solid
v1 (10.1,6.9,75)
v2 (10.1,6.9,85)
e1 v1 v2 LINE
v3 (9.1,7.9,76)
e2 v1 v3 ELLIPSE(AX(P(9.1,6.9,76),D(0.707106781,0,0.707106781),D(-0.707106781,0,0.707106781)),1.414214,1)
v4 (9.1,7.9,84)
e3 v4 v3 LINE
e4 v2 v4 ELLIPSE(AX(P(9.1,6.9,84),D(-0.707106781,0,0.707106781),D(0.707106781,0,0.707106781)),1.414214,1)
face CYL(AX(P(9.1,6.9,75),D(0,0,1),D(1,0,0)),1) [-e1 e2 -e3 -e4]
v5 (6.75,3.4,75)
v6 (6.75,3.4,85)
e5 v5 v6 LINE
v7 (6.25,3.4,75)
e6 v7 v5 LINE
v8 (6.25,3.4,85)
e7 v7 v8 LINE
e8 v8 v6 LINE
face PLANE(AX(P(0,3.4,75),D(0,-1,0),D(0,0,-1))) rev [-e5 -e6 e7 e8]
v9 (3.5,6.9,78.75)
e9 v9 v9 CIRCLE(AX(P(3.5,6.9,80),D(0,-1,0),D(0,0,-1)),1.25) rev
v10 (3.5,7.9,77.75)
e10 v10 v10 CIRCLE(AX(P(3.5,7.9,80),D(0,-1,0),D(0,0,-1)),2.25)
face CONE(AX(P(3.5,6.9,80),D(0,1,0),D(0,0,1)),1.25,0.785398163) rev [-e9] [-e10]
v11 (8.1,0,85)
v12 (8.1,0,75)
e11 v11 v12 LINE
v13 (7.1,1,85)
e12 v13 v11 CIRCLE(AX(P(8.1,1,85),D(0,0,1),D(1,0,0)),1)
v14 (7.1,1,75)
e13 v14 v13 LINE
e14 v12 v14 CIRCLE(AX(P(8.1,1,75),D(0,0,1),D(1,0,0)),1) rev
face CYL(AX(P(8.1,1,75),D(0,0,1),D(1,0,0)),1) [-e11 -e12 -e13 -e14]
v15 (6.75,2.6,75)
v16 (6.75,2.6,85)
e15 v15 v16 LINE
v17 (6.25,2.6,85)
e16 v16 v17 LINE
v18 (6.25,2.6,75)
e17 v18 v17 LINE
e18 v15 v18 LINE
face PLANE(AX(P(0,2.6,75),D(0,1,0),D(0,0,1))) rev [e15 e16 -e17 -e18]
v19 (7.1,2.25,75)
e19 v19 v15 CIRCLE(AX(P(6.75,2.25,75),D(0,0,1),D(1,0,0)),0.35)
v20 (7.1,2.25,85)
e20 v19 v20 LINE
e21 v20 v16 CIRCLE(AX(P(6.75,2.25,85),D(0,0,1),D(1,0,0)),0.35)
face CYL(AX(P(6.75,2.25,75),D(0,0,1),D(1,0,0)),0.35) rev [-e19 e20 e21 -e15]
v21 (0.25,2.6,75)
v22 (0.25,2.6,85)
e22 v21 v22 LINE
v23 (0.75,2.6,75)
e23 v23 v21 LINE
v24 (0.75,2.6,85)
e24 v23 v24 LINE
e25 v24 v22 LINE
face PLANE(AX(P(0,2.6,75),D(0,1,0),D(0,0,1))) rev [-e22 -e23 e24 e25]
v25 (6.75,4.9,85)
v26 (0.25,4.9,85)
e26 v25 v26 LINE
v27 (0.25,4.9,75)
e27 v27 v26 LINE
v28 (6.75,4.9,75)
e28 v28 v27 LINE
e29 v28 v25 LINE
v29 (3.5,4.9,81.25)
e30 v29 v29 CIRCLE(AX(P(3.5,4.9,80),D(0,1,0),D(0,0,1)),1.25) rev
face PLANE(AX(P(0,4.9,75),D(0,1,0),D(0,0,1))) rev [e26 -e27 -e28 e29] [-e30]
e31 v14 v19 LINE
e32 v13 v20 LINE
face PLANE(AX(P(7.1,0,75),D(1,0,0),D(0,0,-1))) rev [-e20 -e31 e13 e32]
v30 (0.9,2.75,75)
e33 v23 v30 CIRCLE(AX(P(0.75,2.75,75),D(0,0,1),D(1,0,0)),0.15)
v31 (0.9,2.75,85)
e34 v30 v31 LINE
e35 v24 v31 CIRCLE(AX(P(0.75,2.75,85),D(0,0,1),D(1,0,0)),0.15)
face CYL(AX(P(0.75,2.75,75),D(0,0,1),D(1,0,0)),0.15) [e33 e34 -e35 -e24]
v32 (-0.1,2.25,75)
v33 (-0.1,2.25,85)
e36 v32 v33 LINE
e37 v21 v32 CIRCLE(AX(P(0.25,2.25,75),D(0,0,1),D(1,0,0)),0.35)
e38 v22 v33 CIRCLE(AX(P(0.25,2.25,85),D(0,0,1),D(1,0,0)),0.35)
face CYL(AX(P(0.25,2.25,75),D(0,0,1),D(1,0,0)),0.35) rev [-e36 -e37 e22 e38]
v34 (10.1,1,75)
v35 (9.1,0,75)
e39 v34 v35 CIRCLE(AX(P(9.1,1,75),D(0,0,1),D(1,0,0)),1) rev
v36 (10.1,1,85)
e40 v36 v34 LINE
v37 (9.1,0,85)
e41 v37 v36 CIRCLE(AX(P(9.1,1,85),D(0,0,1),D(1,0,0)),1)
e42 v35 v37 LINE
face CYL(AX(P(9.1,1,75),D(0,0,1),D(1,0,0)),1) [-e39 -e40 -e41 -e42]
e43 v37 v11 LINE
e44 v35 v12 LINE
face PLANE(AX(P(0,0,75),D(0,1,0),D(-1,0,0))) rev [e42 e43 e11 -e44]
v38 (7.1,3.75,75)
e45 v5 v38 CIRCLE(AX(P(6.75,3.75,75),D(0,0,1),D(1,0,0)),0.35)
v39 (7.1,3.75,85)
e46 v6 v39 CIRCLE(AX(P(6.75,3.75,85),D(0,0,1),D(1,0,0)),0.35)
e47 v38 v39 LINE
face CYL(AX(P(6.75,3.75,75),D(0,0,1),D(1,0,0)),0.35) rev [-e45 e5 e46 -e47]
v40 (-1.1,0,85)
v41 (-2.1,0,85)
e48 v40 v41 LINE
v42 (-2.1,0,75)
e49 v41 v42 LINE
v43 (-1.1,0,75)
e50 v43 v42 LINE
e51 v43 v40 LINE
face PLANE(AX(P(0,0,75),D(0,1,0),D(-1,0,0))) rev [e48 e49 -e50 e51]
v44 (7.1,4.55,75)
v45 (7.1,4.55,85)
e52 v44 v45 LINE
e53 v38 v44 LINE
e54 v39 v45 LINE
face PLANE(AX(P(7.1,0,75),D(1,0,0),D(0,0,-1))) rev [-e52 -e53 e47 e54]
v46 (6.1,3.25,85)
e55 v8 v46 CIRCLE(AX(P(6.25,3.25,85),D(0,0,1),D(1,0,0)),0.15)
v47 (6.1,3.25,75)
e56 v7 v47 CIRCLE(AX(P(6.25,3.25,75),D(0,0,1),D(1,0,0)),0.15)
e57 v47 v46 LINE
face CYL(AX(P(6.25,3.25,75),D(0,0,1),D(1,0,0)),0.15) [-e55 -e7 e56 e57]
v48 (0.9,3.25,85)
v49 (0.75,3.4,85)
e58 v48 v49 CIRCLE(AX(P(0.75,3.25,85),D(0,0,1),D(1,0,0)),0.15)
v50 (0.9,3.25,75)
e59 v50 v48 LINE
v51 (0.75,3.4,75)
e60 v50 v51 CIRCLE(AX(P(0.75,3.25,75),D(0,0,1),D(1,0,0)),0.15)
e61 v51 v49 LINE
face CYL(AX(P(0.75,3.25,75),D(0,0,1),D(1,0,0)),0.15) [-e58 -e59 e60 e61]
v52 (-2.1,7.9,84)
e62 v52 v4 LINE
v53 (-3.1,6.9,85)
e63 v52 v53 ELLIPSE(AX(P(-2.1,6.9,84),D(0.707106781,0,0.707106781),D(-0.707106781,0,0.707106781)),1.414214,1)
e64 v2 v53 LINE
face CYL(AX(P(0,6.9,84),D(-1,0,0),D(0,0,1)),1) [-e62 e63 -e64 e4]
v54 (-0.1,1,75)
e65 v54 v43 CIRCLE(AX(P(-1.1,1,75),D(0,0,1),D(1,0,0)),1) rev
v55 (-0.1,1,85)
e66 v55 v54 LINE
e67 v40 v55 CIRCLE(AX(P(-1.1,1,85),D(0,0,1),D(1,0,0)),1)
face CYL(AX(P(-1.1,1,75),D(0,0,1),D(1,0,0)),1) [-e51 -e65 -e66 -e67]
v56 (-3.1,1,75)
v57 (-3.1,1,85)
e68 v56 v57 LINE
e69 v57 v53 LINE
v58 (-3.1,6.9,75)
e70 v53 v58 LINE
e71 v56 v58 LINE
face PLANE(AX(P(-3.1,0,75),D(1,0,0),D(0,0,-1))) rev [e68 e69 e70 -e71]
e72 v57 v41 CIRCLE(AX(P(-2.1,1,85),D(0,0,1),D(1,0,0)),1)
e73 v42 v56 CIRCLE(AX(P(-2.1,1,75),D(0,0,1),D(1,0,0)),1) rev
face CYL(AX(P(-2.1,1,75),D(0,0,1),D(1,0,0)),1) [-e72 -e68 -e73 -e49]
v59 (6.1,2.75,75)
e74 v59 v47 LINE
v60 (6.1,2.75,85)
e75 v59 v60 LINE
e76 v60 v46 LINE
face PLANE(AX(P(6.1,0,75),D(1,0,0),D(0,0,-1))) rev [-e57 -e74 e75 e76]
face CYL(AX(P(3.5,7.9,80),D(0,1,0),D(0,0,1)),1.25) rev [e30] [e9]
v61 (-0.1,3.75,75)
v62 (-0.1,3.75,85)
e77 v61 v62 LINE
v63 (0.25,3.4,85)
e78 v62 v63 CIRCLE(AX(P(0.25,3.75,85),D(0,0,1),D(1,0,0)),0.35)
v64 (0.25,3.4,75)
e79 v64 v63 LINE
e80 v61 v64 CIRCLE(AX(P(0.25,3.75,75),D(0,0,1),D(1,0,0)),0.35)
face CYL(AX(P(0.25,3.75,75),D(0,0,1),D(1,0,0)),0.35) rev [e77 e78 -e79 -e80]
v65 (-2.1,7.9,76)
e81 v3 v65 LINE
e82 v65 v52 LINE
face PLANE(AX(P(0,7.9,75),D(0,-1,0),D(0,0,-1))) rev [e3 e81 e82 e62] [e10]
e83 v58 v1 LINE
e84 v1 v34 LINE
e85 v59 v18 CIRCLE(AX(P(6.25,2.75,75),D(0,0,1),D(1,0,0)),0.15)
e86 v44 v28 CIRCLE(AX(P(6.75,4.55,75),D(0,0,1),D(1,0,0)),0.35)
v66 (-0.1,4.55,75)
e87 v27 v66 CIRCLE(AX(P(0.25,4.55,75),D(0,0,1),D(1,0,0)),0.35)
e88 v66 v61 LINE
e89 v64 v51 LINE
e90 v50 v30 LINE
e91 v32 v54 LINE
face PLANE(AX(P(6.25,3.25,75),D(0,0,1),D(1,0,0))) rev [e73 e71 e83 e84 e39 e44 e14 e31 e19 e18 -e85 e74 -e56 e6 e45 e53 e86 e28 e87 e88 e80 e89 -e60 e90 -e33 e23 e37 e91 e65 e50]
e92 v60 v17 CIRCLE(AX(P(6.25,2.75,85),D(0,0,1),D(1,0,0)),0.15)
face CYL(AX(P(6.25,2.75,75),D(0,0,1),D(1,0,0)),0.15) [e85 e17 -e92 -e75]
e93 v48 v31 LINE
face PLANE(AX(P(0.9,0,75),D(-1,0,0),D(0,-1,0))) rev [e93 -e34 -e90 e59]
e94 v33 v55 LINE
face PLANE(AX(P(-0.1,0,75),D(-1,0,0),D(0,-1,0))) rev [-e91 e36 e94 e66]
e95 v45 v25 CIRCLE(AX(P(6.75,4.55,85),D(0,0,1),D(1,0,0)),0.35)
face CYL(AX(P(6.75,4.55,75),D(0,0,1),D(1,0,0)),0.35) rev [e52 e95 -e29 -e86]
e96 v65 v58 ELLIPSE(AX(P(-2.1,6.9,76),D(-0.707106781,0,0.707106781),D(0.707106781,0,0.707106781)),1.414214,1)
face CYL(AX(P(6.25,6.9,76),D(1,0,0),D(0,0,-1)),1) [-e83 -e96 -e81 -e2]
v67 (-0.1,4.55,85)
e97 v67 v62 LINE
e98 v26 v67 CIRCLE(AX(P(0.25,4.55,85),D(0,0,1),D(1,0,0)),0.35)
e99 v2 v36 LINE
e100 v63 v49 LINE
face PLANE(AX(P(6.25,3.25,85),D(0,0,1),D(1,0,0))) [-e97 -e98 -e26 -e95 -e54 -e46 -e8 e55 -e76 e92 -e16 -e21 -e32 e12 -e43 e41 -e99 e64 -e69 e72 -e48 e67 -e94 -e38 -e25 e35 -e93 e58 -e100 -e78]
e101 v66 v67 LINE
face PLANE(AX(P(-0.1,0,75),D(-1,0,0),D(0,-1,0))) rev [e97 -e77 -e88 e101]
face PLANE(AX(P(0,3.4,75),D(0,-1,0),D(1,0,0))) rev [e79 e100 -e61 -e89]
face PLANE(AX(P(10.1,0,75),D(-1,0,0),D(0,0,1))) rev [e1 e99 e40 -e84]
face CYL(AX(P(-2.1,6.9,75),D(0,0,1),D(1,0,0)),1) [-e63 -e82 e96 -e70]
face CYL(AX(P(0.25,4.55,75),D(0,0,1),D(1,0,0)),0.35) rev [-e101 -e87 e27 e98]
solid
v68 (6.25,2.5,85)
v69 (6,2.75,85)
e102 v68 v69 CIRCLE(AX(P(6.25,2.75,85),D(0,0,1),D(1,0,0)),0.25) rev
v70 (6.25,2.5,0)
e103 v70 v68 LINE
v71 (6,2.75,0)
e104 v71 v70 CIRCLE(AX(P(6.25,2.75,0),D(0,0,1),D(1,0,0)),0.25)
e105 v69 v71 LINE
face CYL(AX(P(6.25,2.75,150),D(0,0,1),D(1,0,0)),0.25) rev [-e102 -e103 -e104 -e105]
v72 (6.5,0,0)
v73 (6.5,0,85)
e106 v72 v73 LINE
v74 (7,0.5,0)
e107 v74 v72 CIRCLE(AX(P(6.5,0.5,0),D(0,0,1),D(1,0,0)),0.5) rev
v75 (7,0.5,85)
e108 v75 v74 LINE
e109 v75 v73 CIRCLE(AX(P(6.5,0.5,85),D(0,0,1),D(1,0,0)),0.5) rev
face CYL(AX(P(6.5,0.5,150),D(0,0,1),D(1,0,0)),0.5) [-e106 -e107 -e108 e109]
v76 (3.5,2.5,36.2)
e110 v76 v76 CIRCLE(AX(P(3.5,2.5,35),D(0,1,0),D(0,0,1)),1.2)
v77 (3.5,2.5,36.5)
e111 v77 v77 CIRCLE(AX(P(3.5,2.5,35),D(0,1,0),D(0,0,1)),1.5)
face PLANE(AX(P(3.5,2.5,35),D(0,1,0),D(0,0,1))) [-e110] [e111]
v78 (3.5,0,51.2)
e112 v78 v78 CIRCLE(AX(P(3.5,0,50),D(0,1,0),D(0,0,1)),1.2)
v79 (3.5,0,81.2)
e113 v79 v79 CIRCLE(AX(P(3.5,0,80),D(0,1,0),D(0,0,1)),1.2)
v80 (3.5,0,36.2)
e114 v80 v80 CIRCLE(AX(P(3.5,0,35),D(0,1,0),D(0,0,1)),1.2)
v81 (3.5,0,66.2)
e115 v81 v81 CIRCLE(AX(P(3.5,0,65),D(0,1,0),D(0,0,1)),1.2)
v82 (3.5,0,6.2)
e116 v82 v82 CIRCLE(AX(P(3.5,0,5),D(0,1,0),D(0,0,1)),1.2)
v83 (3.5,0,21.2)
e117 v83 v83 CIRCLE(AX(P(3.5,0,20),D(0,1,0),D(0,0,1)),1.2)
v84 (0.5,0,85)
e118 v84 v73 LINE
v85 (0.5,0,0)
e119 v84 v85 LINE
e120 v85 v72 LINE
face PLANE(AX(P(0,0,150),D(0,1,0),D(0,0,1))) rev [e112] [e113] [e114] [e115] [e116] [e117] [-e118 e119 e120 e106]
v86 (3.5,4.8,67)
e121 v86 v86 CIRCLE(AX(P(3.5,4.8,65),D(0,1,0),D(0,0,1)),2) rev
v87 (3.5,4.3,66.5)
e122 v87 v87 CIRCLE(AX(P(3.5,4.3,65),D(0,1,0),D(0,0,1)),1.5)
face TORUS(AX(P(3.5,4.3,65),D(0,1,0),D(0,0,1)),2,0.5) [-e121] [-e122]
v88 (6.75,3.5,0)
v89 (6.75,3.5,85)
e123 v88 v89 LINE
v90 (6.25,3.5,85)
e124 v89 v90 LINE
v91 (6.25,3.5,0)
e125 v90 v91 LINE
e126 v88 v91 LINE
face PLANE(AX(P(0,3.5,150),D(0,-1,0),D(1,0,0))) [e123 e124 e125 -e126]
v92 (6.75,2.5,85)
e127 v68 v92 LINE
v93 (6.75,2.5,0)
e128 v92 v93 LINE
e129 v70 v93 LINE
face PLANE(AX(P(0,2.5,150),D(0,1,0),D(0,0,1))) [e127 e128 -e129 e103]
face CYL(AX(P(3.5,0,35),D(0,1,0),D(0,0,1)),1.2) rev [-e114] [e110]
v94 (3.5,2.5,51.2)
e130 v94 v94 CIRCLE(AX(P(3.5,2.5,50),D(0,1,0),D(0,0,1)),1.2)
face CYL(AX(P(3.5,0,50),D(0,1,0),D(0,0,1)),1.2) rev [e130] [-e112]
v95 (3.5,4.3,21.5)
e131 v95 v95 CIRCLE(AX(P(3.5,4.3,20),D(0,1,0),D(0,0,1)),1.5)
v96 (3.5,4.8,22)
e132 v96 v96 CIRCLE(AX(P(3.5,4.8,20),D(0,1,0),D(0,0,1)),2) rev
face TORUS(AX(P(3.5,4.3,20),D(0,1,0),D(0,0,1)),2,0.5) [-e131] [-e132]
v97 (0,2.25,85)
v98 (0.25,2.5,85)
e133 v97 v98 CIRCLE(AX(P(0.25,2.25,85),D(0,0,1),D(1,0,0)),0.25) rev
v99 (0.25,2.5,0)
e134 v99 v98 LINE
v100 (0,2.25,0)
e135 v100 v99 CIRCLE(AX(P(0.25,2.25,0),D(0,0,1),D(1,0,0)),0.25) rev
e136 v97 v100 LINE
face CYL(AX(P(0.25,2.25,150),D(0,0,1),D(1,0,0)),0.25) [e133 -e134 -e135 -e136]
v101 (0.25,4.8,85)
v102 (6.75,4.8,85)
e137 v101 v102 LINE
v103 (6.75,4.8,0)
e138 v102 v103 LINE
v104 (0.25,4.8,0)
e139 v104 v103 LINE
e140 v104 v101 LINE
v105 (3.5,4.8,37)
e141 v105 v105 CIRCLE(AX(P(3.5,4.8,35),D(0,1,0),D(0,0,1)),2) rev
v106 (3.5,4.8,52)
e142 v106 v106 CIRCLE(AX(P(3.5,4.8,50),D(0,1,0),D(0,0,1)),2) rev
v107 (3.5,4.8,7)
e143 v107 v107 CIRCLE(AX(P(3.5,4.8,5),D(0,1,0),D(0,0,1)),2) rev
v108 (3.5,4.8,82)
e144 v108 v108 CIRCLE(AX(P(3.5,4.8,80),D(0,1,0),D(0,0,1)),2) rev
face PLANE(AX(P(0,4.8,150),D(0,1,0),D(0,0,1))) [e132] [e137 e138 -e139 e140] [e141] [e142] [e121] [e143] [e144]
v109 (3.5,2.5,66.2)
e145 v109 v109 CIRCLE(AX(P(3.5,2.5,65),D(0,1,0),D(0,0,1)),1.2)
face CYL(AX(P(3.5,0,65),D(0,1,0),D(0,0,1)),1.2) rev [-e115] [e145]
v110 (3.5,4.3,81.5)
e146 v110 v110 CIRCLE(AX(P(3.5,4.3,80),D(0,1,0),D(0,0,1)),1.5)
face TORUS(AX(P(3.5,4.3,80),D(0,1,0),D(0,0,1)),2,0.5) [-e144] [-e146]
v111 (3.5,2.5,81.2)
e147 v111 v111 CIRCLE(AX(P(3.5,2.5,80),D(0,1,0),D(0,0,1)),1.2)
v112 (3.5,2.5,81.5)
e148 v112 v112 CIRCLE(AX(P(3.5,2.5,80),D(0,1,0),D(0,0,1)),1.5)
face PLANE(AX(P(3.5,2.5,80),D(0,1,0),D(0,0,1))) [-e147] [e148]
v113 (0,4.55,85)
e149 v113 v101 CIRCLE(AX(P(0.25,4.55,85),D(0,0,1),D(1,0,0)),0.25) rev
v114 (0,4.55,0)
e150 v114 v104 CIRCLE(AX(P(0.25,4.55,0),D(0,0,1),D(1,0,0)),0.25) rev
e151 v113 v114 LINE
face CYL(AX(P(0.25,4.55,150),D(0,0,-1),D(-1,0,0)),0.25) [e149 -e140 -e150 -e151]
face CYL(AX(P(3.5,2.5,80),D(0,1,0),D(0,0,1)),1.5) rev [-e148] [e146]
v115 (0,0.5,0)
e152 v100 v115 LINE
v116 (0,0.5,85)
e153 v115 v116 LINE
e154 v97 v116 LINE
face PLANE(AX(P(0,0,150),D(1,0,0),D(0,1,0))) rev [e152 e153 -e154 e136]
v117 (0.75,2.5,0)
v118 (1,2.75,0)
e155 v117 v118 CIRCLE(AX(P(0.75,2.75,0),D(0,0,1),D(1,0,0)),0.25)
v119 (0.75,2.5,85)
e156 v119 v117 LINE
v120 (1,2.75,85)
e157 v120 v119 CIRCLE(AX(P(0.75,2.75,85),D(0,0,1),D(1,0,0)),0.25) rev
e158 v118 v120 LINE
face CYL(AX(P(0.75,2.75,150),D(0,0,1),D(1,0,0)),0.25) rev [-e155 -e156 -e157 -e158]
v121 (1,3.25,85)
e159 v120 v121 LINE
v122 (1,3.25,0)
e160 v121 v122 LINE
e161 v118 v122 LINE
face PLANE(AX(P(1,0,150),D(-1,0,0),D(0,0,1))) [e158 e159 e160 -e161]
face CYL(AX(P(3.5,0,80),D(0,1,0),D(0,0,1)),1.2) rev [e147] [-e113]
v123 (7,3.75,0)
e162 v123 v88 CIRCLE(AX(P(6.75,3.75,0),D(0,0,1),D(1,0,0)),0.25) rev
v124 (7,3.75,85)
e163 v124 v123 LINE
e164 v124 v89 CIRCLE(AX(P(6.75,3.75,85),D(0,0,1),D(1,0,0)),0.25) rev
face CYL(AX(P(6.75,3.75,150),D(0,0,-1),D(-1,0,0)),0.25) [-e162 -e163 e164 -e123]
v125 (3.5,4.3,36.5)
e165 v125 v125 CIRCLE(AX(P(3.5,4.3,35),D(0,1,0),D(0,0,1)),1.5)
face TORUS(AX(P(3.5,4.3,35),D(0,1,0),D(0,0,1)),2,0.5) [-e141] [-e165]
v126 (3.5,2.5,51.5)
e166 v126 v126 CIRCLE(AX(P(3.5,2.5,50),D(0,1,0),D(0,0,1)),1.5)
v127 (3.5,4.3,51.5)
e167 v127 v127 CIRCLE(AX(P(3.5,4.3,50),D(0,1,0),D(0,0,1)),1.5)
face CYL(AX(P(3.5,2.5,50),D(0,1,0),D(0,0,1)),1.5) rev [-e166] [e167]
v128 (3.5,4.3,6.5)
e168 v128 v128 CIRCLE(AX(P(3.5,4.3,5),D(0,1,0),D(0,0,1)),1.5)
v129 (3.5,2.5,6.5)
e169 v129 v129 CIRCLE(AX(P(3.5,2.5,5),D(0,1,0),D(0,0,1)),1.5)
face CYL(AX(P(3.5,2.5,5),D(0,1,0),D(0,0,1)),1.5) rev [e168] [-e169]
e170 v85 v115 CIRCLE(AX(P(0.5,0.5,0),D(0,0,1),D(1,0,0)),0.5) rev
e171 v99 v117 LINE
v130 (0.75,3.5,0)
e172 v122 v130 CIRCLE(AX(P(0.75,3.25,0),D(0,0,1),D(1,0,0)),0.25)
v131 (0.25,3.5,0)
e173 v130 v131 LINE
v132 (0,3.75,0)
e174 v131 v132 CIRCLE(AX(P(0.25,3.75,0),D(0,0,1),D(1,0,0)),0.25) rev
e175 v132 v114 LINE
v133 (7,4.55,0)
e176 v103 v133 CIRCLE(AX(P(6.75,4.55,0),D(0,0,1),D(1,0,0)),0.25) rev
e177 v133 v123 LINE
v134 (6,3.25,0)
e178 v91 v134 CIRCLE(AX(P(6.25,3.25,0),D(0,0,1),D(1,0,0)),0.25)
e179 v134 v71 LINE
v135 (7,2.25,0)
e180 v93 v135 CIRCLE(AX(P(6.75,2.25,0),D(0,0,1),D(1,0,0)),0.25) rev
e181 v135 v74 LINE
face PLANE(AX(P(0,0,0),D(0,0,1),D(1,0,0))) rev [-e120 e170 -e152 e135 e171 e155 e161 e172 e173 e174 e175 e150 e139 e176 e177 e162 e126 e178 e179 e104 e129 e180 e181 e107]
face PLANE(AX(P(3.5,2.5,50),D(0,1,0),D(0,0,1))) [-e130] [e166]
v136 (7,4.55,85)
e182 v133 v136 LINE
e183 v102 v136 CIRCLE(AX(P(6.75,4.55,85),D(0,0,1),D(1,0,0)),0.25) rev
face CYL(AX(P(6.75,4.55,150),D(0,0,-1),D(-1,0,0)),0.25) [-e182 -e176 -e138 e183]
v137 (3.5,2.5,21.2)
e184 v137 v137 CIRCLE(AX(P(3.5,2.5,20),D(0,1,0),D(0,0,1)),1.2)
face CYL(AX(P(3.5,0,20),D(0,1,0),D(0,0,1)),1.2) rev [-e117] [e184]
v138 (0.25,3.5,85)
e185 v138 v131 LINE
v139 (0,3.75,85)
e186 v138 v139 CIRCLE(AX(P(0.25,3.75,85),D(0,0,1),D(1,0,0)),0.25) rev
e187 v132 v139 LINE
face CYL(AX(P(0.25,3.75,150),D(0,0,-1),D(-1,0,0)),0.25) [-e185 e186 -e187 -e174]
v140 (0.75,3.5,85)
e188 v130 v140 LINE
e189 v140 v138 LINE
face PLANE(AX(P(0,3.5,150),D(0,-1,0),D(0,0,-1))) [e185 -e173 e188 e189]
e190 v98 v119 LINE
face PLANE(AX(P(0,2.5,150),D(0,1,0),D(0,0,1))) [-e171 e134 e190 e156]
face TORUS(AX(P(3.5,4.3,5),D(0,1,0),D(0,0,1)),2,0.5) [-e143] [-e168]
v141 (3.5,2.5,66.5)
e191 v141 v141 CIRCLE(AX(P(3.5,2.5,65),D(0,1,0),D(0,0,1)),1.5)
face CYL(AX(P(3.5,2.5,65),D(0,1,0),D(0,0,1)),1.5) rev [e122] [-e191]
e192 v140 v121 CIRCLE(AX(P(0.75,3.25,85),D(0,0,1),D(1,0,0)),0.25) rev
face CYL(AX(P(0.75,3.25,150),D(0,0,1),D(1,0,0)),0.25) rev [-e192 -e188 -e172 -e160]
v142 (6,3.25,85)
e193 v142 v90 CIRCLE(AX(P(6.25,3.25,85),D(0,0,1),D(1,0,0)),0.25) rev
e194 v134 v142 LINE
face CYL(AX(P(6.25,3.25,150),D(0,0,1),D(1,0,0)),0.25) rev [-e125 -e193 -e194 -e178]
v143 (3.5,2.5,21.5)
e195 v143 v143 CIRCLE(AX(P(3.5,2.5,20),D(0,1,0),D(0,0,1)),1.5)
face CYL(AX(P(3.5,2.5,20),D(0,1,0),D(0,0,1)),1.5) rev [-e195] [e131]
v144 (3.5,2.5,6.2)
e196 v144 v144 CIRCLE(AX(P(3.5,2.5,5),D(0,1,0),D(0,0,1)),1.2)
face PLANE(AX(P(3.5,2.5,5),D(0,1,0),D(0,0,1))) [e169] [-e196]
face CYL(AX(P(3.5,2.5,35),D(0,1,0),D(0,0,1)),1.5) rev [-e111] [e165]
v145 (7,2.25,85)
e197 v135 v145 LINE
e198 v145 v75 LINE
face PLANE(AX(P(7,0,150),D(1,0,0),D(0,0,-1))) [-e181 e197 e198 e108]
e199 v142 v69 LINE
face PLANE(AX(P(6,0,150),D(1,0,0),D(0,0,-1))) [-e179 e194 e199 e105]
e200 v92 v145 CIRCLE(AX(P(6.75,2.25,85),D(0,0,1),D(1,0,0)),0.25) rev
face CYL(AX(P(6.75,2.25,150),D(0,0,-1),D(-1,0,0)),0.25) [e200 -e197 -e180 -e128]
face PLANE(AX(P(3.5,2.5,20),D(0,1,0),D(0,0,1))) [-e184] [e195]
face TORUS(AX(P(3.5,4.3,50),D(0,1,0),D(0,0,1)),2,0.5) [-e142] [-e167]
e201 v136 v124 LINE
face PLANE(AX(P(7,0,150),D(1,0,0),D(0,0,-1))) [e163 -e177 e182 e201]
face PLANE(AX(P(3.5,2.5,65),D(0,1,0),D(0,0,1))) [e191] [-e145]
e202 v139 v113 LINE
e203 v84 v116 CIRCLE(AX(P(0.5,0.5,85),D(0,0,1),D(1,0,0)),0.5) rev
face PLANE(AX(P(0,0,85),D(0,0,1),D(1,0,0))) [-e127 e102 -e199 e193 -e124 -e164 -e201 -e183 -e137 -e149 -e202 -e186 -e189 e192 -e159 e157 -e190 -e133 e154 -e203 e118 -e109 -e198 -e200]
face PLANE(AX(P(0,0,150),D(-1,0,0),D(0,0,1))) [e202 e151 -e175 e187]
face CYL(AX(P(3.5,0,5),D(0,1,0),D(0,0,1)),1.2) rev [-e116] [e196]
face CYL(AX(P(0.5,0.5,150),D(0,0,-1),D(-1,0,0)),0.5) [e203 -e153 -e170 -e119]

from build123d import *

# Parameters (mm, degrees)
EXTRUDE_1_DEPTH                = 150
FILLET_1_R                     = 0.25
FILLET_2_R                     = 0.5
SKETCH_2_R                     = 1.5
CUT_EXTRUDE_1_DEPTH            = 2.3
SKETCH_3_R                     = 1.2
CUT_EXTRUDE_2_DEPTH            = 151.184053747
FILLET_3_R                     = 0.5
PATTERN_LINEAR_2_COUNT         = 10
PATTERN_LINEAR_2_PITCH         = 15
FILLET_3_OF_PATTERN_LINEAR_2_R = 0.5
SKETCH_4_W                     = 7.607362056
SKETCH_4_H                     = 5.534224128
CUT_EXTRUDE_3_DEPTH            = 65
EXTRUDE_START                  = -85
EXTRUDE_2_DEPTH                = 10
FILLET_4_R                     = 1
MM_START                       = 4.9
MM_1_OUTLINE_R                 = 1.25
MM_1_DEPTH                     = 3
CHAMFER_1_SIZE                 = 1


# Read off the part's stored shape, not the designer's step: 大小mm 暗销孔1
with BuildPart() as part:
    # 草图1 → 凸台-拉伸1 (new body)
    with BuildSketch(Plane.XY):
        Polygon((7, 2.5), (7, 0), (0, 0), (0, 2.5), (1, 2.5), (1, 3.5), (0, 3.5), (0, 4.8), (7, 4.8), (7, 3.5), (6, 3.5), (6, 2.5), align=None)
    extrude(amount=EXTRUDE_1_DEPTH)

    # 圆角1
    fillet_1_edges = [part.edges().sort_by_distance(p)[0] for p in [
        (0, 2.5, 75),
        (1, 2.5, 75),
        (1, 3.5, 75),
        (0, 3.5, 75),
        (0, 4.8, 75),
        (7, 4.8, 75),
        (7, 3.5, 75),
        (6, 3.5, 75),
        (6, 2.5, 75),
        (7, 2.5, 75),
    ]]
    fillet(fillet_1_edges, radius=FILLET_1_R)

    # 圆角2
    fillet_2_edges = [part.edges().sort_by_distance(p)[0] for p in [
        (7, 0, 75),
        (0, 0, 75),
    ]]
    fillet(fillet_2_edges, radius=FILLET_2_R)

    # 草图2 → 切除-拉伸1 (cut)
    with BuildSketch(Plane(origin=(0, 4.8, 0), x_dir=(1, 0, 0), z_dir=(0, 1, 0))):
        with Locations(Location((3.5, -5, 0), (0, 0, 270))):
            Circle(SKETCH_2_R)
    cut_extrude_1 = extrude(amount=-CUT_EXTRUDE_1_DEPTH, mode=Mode.SUBTRACT)

    # 草图3 → 切除-拉伸2 (cut, through all)
    with BuildSketch(Plane(origin=(0, 2.5, 0), x_dir=(1, 0, 0), z_dir=(0, 1, 0))):
        with Locations(Location((3.5, -5, 0), (0, 0, 270))):
            Circle(SKETCH_3_R)
    cut_extrude_2 = extrude(amount=-CUT_EXTRUDE_2_DEPTH, mode=Mode.SUBTRACT)

    # 圆角3
    fillet_3_edges = [part.edges().sort_by_distance(p)[0] for p in [
        (3.5, 4.8, 3.5),
    ]]
    fillet(fillet_3_edges, radius=FILLET_3_R)

    # 阵列(线性)2: 切除-拉伸1, 切除-拉伸2 ×10
    with Locations(*[(0, 0, i * PATTERN_LINEAR_2_PITCH) for i in range(1, PATTERN_LINEAR_2_COUNT)]):
        add(cut_extrude_1, mode=Mode.SUBTRACT)
        add(cut_extrude_2, mode=Mode.SUBTRACT)

    # 圆角3 of 阵列(线性)2
    fillet_3_of_pattern_linear_2_edges = [part.edges().sort_by_distance(p)[0] for p in [
        (3.5, 4.8, 18.5),
        (3.5, 4.8, 33.5),
        (3.5, 4.8, 48.5),
        (3.5, 4.8, 63.5),
        (3.5, 4.8, 78.5),
        (3.5, 4.8, 93.5),
        (3.5, 4.8, 108.5),
        (3.5, 4.8, 123.5),
        (3.5, 4.8, 138.5),
    ]]
    fillet(fillet_3_of_pattern_linear_2_edges, radius=FILLET_3_OF_PATTERN_LINEAR_2_R)

    # 草图4 → 切除-拉伸3 (cut)
    with BuildSketch(Plane.XY.offset(150)):
        with Locations((3.651776821, 2.327683724)):
            Rectangle(SKETCH_4_W, SKETCH_4_H)
    extrude(amount=-CUT_EXTRUDE_3_DEPTH, mode=Mode.SUBTRACT)


with BuildPart() as body_2:
    # 草图5 → 凸台-拉伸2 (new body)
    with BuildSketch(Plane(origin=(0, 0, 0), x_dir=(-1, 0, 0), z_dir=(0, 0, -1)).offset(EXTRUDE_START)):
        with BuildLine():
            ThreePointArc((0.1, 4.55), (-0.002512627, 4.797487373), (-0.25, 4.9))
            Line((-0.25, 4.9), (-6.75, 4.9))
            ThreePointArc((-6.75, 4.9), (-6.997487373, 4.797487373), (-7.1, 4.55))
            Line((-7.1, 4.55), (-7.1, 3.75))
            ThreePointArc((-7.1, 3.75), (-6.997487373, 3.502512627), (-6.75, 3.4))
            Line((-6.75, 3.4), (-6.25, 3.4))
            ThreePointArc((-6.25, 3.4), (-6.143933983, 3.356066017), (-6.1, 3.25))
            Line((-6.1, 3.25), (-6.1, 2.75))
            ThreePointArc((-6.1, 2.75), (-6.143933983, 2.643933983), (-6.25, 2.6))
            Line((-6.25, 2.6), (-6.75, 2.6))
            ThreePointArc((-6.75, 2.6), (-6.997487373, 2.497487373), (-7.1, 2.25))
            Line((-7.1, 2.25), (-7.1, 0))
            Line((-7.1, 0), (-10.1, 0))
            Line((-10.1, 0), (-10.1, 7.9))
            Line((-10.1, 7.9), (3.1, 7.9))
            Line((3.1, 7.9), (3.1, 0))
            Line((3.1, 0), (0.1, 0))
            Line((0.1, 0), (0.1, 2.25))
            ThreePointArc((0.1, 2.25), (-0.002512627, 2.497487373), (-0.25, 2.6))
            Line((-0.25, 2.6), (-0.75, 2.6))
            ThreePointArc((-0.75, 2.6), (-0.856066017, 2.643933983), (-0.9, 2.75))
            Line((-0.9, 2.75), (-0.9, 3.25))
            ThreePointArc((-0.9, 3.25), (-0.856066017, 3.356066017), (-0.75, 3.4))
            Line((-0.75, 3.4), (-0.25, 3.4))
            ThreePointArc((-0.25, 3.4), (-0.002512627, 3.502512627), (0.1, 3.75))
            Line((0.1, 3.75), (0.1, 4.55))
        make_face()
    extrude(amount=EXTRUDE_2_DEPTH)

    # 圆角4
    fillet_4_edges = [body_2.edges().sort_by_distance(p)[0] for p in [
        (3.5, 7.9, 85),
        (3.5, 7.9, 75),
        (-0.1, 0, 80),
        (-3.1, 0, 80),
        (-3.1, 7.9, 80),
        (10.1, 7.9, 80),
        (10.1, 0, 80),
        (7.1, 0, 80),
    ]]
    fillet(fillet_4_edges, radius=FILLET_4_R)

    # 大小mm 暗销孔1 outline → 大小mm 暗销孔1 (cut)
    with BuildSketch(Plane(origin=(0, 0, 0), x_dir=(1, 0, 0), z_dir=(0, 1, 0)).offset(MM_START)):
        with Locations((3.5, -80)):
            Circle(MM_1_OUTLINE_R)
    extrude(amount=MM_1_DEPTH, mode=Mode.SUBTRACT)

    # 倒角1
    chamfer_1_edges = [body_2.edges().sort_by_distance(p)[0] for p in [
        (2.25, 7.9, 80),
    ]]
    chamfer(chamfer_1_edges, length=CHAMFER_1_SIZE)


solid = Compound([part.part, body_2.part])
